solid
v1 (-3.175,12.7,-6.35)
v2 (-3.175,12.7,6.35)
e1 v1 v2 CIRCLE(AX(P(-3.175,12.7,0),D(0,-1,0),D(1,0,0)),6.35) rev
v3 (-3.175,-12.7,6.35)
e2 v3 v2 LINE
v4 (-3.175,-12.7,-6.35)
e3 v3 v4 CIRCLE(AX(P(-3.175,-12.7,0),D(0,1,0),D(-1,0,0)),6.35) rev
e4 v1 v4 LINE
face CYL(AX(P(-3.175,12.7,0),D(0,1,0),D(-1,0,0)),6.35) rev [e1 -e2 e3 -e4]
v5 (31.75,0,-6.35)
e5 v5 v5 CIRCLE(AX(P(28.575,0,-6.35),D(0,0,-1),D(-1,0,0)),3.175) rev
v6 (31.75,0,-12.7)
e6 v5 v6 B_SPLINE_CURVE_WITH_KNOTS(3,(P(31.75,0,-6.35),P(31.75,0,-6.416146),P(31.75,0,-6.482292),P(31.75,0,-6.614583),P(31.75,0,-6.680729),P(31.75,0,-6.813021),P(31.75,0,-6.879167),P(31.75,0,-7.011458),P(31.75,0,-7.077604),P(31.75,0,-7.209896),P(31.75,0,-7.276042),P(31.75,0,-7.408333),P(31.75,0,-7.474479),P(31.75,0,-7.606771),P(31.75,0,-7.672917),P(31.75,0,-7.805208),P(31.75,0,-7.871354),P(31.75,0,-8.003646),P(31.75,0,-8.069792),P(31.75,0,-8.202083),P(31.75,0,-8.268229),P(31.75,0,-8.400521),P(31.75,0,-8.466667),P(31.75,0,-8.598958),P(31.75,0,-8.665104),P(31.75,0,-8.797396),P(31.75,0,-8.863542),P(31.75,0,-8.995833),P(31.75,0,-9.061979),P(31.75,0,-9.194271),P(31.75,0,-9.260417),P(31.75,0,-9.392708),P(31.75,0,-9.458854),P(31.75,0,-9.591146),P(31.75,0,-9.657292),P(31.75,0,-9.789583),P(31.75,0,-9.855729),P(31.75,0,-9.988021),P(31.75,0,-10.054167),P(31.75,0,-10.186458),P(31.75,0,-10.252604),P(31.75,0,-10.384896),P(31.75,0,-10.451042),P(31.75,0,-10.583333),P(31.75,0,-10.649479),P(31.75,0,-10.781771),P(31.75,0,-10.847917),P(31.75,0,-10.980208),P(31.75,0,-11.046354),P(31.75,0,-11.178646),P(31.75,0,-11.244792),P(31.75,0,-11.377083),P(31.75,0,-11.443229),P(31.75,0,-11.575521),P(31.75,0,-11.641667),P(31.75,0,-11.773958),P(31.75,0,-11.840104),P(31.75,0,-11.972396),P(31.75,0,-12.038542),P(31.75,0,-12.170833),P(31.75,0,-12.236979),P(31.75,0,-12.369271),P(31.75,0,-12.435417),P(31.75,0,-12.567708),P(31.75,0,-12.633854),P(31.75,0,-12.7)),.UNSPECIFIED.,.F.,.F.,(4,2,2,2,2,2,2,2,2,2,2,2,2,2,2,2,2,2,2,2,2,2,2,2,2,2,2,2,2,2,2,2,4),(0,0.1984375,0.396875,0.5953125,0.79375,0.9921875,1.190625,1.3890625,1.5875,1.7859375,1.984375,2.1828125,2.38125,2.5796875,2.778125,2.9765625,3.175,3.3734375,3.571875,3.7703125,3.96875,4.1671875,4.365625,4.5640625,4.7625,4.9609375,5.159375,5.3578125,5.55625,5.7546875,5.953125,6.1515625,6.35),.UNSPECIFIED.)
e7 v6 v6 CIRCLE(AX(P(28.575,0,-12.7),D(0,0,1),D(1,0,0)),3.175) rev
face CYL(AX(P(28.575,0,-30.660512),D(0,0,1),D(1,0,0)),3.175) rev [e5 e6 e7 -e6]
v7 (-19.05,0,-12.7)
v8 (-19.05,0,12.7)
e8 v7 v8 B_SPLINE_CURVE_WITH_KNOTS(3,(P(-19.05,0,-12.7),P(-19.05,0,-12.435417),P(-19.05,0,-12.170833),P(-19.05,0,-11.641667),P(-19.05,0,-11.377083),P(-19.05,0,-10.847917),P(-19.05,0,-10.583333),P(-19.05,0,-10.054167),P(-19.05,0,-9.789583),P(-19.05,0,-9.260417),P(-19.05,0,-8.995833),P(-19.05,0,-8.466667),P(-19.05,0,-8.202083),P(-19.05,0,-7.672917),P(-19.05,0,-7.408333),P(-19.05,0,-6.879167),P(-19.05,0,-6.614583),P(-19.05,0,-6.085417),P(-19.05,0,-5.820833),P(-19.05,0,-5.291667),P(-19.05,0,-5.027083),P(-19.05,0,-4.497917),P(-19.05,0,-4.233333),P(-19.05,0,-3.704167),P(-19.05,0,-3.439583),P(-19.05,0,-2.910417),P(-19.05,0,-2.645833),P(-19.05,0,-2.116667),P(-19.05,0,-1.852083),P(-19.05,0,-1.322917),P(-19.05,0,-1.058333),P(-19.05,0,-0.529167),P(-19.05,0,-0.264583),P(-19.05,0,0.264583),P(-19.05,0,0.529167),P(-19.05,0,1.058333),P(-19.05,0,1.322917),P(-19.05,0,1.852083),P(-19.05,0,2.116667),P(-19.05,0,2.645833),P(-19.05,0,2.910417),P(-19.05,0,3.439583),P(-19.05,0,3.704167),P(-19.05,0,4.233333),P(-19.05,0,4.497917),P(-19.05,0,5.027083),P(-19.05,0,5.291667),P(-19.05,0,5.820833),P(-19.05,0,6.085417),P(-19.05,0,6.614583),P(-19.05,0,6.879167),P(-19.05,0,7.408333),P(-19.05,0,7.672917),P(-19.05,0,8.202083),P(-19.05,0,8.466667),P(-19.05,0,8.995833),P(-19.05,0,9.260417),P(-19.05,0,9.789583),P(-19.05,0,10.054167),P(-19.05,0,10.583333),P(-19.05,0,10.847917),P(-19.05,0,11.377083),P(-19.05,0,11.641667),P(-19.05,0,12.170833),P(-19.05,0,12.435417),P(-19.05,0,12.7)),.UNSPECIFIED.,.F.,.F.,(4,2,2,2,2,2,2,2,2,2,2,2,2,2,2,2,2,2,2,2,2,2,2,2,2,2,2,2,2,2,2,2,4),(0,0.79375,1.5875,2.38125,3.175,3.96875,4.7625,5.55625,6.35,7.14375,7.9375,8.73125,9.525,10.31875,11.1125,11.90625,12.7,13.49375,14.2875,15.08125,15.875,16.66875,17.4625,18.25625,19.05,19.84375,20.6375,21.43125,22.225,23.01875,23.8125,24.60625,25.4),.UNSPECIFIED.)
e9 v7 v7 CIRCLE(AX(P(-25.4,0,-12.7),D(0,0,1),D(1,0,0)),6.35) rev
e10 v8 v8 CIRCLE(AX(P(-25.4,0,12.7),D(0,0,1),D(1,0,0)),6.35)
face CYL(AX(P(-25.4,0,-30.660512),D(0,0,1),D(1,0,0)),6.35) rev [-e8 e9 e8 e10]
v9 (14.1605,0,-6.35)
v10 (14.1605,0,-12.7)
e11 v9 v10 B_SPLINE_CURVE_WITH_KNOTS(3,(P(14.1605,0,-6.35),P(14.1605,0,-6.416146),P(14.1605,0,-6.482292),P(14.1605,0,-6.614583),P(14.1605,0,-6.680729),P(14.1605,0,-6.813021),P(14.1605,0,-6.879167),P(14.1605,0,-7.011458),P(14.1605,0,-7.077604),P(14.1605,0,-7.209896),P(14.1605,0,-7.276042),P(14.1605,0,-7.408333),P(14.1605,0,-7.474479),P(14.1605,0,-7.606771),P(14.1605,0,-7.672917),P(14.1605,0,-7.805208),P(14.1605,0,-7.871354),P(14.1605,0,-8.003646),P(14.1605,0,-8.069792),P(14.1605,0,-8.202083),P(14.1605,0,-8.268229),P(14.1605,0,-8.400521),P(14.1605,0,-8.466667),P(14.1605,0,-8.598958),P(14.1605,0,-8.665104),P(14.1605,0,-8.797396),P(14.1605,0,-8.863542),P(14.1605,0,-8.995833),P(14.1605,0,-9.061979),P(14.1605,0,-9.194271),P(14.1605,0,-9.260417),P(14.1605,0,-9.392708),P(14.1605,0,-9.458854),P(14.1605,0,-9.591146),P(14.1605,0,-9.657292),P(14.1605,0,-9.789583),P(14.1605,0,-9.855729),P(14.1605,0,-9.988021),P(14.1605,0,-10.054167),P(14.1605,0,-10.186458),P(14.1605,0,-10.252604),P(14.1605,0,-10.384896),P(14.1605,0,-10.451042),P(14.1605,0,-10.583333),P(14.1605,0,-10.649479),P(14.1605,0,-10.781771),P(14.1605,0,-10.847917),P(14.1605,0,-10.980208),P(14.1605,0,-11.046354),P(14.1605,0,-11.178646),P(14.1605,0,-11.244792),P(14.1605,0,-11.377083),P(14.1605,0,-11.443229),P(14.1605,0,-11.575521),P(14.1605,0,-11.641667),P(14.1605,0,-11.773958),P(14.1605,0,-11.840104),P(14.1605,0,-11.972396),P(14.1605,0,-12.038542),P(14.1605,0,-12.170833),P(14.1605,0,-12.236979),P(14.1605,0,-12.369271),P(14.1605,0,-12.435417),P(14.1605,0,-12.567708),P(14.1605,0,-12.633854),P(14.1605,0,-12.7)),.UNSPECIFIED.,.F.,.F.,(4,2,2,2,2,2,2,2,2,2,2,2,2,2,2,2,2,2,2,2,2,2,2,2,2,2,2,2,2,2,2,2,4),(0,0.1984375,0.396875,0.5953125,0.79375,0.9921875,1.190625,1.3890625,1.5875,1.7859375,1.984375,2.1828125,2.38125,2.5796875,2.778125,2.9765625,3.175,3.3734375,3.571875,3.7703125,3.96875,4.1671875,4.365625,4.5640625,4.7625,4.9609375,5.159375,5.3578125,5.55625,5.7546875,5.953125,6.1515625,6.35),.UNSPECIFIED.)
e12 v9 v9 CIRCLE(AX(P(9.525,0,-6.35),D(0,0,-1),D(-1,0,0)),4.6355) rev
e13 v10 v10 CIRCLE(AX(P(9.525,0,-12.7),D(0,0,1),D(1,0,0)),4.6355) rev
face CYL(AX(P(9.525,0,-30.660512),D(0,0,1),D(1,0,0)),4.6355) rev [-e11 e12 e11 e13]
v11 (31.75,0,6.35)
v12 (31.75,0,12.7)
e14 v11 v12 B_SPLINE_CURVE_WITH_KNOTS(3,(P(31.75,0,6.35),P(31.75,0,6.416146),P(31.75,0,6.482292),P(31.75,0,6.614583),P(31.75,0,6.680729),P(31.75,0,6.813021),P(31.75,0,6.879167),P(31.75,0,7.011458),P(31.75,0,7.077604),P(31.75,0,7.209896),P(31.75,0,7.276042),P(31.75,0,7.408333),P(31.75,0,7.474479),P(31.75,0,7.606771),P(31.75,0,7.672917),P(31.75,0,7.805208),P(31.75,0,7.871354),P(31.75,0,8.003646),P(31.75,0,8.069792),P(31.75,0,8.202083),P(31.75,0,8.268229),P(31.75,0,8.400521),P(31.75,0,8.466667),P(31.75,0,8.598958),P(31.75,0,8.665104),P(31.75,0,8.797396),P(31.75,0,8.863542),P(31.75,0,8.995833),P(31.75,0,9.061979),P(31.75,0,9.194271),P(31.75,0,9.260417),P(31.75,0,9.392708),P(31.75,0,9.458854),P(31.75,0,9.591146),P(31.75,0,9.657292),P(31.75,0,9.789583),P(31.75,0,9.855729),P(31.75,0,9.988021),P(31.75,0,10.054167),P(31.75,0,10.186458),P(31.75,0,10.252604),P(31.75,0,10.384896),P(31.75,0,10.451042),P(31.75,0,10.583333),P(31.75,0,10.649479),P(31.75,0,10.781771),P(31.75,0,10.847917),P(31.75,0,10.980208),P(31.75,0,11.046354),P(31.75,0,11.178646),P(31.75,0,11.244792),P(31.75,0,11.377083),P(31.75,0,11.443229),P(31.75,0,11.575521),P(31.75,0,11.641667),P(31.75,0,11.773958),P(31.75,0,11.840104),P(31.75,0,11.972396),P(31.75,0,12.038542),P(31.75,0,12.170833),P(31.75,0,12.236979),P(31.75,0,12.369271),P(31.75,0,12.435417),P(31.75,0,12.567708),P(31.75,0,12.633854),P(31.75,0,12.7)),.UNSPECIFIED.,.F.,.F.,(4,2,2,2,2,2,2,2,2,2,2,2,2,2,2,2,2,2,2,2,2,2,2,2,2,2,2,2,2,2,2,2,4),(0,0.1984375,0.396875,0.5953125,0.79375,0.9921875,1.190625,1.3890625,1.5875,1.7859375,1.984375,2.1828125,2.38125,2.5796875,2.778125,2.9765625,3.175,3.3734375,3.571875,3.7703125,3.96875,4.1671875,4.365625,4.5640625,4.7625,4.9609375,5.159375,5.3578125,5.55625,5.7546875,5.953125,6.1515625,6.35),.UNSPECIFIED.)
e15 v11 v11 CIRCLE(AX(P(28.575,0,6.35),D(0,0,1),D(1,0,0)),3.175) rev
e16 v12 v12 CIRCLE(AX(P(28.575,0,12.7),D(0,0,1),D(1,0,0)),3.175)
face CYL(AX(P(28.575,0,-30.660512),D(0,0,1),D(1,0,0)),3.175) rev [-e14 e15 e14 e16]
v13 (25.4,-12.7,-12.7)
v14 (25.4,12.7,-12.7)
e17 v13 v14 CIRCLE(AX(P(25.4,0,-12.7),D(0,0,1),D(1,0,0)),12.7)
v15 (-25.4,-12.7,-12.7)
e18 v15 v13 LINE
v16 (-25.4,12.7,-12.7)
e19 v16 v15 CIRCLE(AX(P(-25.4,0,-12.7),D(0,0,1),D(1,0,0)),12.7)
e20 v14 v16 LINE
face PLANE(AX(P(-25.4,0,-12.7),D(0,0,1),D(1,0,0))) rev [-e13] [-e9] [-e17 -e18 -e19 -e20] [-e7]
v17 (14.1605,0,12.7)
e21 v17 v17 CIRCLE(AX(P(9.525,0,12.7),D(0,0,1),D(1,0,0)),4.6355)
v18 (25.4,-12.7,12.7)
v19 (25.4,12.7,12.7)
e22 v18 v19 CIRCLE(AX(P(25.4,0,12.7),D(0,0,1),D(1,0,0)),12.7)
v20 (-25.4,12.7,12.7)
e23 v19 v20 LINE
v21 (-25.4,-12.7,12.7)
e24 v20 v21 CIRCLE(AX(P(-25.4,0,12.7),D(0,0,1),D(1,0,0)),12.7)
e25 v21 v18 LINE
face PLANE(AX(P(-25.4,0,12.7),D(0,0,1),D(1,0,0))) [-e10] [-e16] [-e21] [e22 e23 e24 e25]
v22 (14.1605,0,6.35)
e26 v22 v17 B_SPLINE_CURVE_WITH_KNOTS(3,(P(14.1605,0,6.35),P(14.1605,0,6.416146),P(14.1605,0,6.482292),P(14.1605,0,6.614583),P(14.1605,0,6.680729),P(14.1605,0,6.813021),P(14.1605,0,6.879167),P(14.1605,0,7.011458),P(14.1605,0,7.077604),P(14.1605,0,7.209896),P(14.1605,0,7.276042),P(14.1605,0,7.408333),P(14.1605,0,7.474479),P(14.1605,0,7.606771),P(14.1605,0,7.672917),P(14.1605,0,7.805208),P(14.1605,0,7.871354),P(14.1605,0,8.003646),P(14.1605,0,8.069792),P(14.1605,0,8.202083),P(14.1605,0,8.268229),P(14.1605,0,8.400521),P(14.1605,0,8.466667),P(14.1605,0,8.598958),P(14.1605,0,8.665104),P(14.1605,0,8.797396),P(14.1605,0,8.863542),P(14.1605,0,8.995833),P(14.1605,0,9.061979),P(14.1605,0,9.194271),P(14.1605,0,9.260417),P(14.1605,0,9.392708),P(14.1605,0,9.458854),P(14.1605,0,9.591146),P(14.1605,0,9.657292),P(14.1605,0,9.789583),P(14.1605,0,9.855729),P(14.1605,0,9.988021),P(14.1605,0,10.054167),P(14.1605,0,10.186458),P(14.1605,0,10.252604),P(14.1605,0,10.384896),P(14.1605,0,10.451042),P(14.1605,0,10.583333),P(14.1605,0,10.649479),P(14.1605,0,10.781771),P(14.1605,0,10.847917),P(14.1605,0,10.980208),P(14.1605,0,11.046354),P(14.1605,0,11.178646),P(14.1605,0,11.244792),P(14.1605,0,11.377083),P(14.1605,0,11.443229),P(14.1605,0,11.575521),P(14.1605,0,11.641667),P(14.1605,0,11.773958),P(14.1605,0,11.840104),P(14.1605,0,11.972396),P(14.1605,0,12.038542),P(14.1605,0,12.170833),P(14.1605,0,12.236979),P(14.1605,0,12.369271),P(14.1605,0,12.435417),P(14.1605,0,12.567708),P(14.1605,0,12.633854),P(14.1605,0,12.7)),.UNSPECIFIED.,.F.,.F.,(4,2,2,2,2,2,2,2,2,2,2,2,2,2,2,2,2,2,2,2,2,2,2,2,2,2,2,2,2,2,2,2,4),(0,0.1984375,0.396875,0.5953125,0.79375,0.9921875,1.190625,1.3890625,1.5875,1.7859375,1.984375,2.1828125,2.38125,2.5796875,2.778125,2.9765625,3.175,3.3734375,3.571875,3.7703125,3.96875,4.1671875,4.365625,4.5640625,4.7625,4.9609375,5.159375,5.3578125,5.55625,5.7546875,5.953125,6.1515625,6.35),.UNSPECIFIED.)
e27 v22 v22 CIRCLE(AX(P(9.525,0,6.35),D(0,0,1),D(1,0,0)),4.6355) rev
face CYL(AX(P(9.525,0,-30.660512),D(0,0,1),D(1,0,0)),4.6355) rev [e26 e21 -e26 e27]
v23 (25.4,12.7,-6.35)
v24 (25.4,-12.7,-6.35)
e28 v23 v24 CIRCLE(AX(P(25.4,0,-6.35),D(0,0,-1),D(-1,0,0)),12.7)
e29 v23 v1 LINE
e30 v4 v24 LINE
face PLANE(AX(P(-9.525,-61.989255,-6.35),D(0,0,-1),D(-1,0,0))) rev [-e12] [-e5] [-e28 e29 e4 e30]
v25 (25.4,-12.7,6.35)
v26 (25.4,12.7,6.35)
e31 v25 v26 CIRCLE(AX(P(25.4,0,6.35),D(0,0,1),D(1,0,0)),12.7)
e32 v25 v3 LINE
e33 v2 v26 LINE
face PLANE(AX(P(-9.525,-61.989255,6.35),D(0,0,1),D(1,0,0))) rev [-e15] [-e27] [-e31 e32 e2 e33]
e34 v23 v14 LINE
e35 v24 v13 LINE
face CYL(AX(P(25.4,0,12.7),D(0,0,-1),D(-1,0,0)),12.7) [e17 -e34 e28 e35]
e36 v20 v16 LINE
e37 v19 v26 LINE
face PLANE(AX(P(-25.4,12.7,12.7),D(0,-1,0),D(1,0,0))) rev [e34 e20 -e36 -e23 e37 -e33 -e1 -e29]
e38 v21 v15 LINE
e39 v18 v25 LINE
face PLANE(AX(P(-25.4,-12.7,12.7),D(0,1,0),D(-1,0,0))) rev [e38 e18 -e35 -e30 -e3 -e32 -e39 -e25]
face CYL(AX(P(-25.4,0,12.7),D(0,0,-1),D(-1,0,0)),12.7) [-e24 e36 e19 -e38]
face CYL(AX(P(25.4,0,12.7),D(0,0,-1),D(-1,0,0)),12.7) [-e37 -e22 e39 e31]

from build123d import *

# Parameters (mm, degrees)
BOSS_EXTRUDE1_DEPTH = 12.7
SKETCH2_R           = 3.175
SKETCH2_R_2         = 4.6355
SKETCH2_R_3         = 6.35
CUT_EXTRUDE1_DEPTH  = 25.4
SKETCH3_W           = 47.625
SKETCH3_H           = 12.7
CUT_EXTRUDE2_DEPTH  = 25.4
FILLET1_R           = 6.35


with BuildPart() as part:
    # Sketch1 → Boss-Extrude1 (new, symmetric)
    with BuildSketch(Plane.XY):
        with BuildLine():
            Line((-25.4, 12.7), (25.4, 12.7))
            ThreePointArc((25.4, 12.7), (38.1, 0), (25.4, -12.7))
            Line((25.4, -12.7), (-25.4, -12.7))
            ThreePointArc((-25.4, -12.7), (-38.1, 0), (-25.4, 12.7))
        make_face()
    extrude(amount=BOSS_EXTRUDE1_DEPTH, both=True)

    # Sketch2 → Cut-Extrude1 (cut)
    with BuildSketch(Plane.XY.offset(12.7)):
        with Locations((28.575, 0)):
            Circle(SKETCH2_R)
        with Locations((9.525, 0)):
            Circle(SKETCH2_R_2)
        with Locations((-25.4, 0)):
            Circle(SKETCH2_R_3)
    extrude(amount=-CUT_EXTRUDE1_DEPTH, mode=Mode.SUBTRACT)

    # Sketch3 → Cut-Extrude2 (cut)
    with BuildSketch(Plane(origin=(0, 12.7, 0), x_dir=(1, 0, 0), z_dir=(0, 1, 0))):
        with Locations((14.2875, 0)):
            Rectangle(SKETCH3_W, SKETCH3_H)
    extrude(amount=-CUT_EXTRUDE2_DEPTH, mode=Mode.SUBTRACT)

    # Fillet1
    fillet1_edges = [part.edges().sort_by_distance(p)[0] for p in [
        (-9.525, 0, -6.35),
        (-9.525, 0, 6.35),
    ]]
    fillet(fillet1_edges, radius=FILLET1_R - 0.0001)  # a hair under: the kernel refuses the full size


solid = part.part
